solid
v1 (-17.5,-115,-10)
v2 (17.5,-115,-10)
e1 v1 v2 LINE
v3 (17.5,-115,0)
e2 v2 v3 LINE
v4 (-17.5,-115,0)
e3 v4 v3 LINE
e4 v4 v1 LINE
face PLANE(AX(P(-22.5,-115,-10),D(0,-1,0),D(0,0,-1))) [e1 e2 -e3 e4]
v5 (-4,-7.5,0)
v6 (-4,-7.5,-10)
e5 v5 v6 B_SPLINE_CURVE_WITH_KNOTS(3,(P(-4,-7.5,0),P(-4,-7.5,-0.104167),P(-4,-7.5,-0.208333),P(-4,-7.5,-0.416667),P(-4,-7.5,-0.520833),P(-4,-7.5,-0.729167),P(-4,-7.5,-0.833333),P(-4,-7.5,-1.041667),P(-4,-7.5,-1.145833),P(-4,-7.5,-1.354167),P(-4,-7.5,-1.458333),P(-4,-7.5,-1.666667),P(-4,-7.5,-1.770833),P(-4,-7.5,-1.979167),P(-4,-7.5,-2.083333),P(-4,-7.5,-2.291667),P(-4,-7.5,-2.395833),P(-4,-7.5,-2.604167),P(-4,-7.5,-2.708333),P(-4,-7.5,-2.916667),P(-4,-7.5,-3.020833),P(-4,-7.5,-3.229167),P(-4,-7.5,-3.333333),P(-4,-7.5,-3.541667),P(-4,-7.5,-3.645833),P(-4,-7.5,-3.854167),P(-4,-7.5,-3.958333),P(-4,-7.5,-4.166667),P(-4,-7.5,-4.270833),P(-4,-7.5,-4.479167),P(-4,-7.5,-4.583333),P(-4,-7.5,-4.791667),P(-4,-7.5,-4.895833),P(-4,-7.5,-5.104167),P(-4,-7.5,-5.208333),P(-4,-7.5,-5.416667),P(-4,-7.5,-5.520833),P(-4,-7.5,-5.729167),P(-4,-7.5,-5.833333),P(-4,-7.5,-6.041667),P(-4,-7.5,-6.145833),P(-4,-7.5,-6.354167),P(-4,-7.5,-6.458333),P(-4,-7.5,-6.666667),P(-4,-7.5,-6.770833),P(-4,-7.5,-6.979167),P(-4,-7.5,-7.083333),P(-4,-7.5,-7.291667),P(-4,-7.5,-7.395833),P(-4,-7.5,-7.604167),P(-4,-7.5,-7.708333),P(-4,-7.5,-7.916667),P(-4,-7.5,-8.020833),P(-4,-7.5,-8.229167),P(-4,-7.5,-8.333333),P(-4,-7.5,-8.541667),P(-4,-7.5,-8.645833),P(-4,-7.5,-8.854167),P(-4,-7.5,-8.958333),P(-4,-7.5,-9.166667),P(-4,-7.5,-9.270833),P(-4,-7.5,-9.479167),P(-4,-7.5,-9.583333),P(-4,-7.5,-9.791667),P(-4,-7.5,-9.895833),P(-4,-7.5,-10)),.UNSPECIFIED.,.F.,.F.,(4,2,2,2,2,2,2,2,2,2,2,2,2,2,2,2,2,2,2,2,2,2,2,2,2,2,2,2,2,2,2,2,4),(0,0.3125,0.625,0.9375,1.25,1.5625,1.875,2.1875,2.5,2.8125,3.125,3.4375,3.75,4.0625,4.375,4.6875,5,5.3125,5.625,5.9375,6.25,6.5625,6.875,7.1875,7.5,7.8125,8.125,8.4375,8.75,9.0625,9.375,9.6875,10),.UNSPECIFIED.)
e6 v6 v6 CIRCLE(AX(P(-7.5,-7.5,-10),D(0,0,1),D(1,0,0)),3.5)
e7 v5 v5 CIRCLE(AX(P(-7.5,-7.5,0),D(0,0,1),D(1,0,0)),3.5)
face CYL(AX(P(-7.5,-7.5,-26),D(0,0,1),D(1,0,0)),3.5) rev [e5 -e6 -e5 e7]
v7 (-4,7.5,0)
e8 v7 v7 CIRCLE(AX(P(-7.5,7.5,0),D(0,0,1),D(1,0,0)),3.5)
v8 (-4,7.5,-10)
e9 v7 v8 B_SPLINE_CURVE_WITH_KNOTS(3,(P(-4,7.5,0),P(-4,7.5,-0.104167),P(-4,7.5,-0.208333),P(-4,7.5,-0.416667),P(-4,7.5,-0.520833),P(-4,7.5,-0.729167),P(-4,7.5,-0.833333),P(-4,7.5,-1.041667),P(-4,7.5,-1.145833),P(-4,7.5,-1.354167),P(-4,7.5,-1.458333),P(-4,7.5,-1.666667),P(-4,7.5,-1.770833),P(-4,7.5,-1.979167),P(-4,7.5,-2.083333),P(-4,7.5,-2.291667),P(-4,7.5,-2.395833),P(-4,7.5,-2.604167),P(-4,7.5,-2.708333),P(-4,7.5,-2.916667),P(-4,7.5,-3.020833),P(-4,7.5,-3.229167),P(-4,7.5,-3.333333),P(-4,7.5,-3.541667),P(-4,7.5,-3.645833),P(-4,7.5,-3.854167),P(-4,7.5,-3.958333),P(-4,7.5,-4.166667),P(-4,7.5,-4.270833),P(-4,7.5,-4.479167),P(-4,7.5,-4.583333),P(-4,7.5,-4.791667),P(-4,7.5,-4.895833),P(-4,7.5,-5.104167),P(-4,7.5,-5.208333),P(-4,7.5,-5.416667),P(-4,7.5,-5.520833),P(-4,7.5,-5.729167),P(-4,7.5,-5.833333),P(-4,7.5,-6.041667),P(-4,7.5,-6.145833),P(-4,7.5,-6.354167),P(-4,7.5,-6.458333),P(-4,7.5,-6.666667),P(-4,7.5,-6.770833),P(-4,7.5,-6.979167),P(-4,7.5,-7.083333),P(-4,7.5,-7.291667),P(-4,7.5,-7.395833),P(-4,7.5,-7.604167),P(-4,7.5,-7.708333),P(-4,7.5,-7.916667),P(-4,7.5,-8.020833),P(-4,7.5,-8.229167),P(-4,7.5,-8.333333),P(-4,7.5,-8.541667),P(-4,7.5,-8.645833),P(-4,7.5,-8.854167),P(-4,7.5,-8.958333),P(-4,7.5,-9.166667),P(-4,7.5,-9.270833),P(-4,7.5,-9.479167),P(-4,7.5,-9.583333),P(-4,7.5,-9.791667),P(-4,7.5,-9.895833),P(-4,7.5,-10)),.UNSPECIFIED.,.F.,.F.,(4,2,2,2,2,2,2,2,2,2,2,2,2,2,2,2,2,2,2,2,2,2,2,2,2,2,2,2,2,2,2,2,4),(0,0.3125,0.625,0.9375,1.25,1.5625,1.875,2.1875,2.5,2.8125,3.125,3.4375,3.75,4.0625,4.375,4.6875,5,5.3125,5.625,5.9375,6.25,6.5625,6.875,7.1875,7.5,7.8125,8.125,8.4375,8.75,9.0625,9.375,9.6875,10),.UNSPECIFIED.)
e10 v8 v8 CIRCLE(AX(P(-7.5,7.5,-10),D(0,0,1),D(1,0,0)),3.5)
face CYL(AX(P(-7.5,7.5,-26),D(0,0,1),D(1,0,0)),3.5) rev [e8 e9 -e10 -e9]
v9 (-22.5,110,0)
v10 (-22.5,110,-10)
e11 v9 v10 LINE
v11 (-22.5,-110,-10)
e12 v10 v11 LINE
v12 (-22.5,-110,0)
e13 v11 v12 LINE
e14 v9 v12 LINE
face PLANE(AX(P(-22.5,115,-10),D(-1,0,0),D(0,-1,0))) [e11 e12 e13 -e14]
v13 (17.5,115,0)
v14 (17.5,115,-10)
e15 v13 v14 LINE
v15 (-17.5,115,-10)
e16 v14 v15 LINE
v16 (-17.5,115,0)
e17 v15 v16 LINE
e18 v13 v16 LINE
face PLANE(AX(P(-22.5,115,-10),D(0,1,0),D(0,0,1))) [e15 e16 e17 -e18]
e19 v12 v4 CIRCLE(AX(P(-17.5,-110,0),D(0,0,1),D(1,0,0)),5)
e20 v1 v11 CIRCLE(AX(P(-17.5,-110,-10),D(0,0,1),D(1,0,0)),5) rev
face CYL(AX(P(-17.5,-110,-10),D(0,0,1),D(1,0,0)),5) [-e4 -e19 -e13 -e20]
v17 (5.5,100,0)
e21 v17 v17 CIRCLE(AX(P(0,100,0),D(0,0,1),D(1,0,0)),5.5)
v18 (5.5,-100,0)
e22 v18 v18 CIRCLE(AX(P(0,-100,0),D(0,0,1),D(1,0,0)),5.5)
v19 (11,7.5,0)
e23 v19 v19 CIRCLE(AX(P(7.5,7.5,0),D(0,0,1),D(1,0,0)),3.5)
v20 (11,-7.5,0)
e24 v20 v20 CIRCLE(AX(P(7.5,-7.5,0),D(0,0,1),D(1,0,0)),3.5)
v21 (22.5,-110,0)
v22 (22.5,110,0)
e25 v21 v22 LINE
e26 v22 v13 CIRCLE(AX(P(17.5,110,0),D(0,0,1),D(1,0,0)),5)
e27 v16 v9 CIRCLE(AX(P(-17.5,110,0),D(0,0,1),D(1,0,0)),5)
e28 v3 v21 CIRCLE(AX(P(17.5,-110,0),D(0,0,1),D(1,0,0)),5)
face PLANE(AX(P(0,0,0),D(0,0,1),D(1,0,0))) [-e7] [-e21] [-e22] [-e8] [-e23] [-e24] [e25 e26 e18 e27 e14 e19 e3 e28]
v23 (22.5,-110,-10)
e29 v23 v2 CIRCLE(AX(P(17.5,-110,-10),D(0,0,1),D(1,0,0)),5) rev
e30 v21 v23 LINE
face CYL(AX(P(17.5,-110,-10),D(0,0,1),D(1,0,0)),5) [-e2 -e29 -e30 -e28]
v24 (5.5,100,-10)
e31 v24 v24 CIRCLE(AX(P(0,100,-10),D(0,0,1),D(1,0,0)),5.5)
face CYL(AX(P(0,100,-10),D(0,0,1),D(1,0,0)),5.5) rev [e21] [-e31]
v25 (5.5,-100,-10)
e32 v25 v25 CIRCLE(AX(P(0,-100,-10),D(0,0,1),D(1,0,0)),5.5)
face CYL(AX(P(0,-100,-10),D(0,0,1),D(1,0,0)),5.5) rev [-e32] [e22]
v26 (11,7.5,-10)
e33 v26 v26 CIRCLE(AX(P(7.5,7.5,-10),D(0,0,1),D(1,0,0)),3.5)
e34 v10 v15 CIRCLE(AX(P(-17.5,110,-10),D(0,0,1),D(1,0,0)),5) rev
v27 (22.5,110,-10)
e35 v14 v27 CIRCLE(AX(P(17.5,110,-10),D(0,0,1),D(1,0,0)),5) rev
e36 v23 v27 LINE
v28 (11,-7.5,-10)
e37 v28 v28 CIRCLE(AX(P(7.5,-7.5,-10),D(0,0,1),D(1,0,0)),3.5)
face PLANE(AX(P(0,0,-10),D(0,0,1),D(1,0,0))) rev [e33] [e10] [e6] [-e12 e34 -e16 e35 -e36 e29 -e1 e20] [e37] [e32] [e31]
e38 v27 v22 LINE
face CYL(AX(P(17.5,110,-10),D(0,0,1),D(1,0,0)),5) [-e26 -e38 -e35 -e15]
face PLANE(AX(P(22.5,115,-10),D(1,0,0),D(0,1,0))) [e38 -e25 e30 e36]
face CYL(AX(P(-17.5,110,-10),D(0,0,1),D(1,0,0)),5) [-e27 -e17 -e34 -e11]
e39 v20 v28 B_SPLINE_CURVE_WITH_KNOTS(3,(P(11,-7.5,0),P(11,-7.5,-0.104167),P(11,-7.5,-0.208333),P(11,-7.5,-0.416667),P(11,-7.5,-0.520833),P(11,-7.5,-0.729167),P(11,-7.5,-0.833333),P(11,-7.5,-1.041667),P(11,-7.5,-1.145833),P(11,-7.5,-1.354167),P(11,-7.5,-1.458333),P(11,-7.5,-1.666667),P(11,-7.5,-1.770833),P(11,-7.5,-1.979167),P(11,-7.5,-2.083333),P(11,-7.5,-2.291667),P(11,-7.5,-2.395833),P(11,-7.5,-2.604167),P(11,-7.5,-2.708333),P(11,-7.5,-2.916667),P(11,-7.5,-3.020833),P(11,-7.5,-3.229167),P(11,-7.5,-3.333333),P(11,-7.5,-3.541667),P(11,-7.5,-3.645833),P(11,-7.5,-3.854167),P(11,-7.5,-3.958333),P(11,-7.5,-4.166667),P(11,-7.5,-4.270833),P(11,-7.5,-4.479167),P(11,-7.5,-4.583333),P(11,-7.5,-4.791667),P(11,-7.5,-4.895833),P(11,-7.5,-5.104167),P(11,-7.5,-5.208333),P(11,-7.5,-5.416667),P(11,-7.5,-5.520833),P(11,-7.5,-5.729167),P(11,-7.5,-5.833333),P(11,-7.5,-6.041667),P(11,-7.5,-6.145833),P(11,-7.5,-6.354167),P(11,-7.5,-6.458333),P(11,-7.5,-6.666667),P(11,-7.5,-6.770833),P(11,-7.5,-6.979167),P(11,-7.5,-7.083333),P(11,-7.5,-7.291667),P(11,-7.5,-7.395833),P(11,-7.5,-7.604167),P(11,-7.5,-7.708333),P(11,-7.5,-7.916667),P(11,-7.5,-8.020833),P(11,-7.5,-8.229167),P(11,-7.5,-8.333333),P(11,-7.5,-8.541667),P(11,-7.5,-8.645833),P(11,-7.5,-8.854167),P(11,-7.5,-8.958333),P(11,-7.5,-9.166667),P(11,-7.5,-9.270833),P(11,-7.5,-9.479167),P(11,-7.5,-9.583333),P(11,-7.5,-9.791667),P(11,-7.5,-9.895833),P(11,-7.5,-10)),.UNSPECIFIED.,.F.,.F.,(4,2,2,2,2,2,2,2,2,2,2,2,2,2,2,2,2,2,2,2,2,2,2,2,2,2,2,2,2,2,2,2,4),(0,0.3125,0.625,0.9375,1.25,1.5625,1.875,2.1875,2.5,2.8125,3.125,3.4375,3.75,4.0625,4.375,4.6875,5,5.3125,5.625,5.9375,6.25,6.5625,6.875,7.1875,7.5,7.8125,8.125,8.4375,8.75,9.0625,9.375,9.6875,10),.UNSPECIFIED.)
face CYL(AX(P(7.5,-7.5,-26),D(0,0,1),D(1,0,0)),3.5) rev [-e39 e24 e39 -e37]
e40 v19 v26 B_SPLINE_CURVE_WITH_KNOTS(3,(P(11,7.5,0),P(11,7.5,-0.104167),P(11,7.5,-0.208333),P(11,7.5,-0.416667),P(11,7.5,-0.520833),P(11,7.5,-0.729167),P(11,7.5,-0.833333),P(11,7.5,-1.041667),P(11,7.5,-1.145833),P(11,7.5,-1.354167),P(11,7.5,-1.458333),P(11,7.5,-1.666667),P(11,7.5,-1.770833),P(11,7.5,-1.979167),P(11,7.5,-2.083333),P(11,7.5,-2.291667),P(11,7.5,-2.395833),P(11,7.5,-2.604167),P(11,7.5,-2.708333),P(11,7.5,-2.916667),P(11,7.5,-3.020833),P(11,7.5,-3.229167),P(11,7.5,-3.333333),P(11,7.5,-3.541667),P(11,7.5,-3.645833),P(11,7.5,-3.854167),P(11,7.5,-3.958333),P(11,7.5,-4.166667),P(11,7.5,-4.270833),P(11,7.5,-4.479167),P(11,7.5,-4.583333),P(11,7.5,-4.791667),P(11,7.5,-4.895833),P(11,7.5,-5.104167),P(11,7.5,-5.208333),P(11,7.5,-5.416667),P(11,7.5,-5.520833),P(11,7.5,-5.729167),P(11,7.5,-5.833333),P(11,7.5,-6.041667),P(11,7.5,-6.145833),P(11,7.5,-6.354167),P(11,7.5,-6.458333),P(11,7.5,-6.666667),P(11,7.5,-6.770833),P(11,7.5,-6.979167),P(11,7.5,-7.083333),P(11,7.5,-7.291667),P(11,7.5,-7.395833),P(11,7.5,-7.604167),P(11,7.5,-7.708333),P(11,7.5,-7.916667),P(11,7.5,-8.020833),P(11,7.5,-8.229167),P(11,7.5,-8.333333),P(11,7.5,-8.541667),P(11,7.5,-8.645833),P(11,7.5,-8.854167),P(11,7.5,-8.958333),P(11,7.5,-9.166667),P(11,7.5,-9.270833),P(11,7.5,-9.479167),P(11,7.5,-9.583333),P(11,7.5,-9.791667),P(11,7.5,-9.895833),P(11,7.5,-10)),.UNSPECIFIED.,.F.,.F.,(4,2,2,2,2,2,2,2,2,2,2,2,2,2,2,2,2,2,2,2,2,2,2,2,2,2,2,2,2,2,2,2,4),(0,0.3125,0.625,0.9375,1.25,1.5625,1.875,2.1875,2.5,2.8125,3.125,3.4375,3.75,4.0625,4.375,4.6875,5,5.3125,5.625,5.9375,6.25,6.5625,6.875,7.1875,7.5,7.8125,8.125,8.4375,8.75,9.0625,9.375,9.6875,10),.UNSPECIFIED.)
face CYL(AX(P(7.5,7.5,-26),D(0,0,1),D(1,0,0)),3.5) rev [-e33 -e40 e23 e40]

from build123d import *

# Parameters (mm, degrees)
IZIM1_W               = 45
IZIM1_H               = 230
TABAN_FLAN_1_DEPTH    = 10
IZIM6_R               = 3.5
KES_EKSTR_ZYON1_DEPTH = 26
IZIM7_R               = 5.5
KES_EKSTR_ZYON2_DEPTH = 10
RADYUS1_R             = 5


# Sheet-metal steps are written as plain solids
with BuildPart() as part:
    # Çizim1 → Taban-Flanş1 (new body)
    with BuildSketch(Plane.XY):
        Rectangle(IZIM1_W, IZIM1_H)
    extrude(amount=-TABAN_FLAN_1_DEPTH)

    # Çizim6 → Kes-Ekstrüzyon1 (cut)
    with BuildSketch(Plane.XY):
        with Locations((7.5, 7.5)):
            Circle(IZIM6_R)
        with Locations((-7.5, 7.5)):
            Circle(IZIM6_R)
        with Locations((7.5, -7.5)):
            Circle(IZIM6_R)
        with Locations((-7.5, -7.5)):
            Circle(IZIM6_R)
    extrude(amount=-KES_EKSTR_ZYON1_DEPTH, mode=Mode.SUBTRACT)

    # Çizim7 → Kes-Ekstrüzyon2 (cut)
    with BuildSketch(Plane.XY):
        with Locations((0, -100)):
            Circle(IZIM7_R)
        with Locations((0, 100)):
            Circle(IZIM7_R)
    extrude(amount=-KES_EKSTR_ZYON2_DEPTH, mode=Mode.SUBTRACT)

    # Radyus1
    radyus1_edges = [part.edges().sort_by_distance(p)[0] for p in [
        (22.5, -115, -5),
        (-22.5, -115, -5),
        (-22.5, 115, -5),
        (22.5, 115, -5),
    ]]
    fillet(radyus1_edges, radius=RADYUS1_R)


solid = part.part
